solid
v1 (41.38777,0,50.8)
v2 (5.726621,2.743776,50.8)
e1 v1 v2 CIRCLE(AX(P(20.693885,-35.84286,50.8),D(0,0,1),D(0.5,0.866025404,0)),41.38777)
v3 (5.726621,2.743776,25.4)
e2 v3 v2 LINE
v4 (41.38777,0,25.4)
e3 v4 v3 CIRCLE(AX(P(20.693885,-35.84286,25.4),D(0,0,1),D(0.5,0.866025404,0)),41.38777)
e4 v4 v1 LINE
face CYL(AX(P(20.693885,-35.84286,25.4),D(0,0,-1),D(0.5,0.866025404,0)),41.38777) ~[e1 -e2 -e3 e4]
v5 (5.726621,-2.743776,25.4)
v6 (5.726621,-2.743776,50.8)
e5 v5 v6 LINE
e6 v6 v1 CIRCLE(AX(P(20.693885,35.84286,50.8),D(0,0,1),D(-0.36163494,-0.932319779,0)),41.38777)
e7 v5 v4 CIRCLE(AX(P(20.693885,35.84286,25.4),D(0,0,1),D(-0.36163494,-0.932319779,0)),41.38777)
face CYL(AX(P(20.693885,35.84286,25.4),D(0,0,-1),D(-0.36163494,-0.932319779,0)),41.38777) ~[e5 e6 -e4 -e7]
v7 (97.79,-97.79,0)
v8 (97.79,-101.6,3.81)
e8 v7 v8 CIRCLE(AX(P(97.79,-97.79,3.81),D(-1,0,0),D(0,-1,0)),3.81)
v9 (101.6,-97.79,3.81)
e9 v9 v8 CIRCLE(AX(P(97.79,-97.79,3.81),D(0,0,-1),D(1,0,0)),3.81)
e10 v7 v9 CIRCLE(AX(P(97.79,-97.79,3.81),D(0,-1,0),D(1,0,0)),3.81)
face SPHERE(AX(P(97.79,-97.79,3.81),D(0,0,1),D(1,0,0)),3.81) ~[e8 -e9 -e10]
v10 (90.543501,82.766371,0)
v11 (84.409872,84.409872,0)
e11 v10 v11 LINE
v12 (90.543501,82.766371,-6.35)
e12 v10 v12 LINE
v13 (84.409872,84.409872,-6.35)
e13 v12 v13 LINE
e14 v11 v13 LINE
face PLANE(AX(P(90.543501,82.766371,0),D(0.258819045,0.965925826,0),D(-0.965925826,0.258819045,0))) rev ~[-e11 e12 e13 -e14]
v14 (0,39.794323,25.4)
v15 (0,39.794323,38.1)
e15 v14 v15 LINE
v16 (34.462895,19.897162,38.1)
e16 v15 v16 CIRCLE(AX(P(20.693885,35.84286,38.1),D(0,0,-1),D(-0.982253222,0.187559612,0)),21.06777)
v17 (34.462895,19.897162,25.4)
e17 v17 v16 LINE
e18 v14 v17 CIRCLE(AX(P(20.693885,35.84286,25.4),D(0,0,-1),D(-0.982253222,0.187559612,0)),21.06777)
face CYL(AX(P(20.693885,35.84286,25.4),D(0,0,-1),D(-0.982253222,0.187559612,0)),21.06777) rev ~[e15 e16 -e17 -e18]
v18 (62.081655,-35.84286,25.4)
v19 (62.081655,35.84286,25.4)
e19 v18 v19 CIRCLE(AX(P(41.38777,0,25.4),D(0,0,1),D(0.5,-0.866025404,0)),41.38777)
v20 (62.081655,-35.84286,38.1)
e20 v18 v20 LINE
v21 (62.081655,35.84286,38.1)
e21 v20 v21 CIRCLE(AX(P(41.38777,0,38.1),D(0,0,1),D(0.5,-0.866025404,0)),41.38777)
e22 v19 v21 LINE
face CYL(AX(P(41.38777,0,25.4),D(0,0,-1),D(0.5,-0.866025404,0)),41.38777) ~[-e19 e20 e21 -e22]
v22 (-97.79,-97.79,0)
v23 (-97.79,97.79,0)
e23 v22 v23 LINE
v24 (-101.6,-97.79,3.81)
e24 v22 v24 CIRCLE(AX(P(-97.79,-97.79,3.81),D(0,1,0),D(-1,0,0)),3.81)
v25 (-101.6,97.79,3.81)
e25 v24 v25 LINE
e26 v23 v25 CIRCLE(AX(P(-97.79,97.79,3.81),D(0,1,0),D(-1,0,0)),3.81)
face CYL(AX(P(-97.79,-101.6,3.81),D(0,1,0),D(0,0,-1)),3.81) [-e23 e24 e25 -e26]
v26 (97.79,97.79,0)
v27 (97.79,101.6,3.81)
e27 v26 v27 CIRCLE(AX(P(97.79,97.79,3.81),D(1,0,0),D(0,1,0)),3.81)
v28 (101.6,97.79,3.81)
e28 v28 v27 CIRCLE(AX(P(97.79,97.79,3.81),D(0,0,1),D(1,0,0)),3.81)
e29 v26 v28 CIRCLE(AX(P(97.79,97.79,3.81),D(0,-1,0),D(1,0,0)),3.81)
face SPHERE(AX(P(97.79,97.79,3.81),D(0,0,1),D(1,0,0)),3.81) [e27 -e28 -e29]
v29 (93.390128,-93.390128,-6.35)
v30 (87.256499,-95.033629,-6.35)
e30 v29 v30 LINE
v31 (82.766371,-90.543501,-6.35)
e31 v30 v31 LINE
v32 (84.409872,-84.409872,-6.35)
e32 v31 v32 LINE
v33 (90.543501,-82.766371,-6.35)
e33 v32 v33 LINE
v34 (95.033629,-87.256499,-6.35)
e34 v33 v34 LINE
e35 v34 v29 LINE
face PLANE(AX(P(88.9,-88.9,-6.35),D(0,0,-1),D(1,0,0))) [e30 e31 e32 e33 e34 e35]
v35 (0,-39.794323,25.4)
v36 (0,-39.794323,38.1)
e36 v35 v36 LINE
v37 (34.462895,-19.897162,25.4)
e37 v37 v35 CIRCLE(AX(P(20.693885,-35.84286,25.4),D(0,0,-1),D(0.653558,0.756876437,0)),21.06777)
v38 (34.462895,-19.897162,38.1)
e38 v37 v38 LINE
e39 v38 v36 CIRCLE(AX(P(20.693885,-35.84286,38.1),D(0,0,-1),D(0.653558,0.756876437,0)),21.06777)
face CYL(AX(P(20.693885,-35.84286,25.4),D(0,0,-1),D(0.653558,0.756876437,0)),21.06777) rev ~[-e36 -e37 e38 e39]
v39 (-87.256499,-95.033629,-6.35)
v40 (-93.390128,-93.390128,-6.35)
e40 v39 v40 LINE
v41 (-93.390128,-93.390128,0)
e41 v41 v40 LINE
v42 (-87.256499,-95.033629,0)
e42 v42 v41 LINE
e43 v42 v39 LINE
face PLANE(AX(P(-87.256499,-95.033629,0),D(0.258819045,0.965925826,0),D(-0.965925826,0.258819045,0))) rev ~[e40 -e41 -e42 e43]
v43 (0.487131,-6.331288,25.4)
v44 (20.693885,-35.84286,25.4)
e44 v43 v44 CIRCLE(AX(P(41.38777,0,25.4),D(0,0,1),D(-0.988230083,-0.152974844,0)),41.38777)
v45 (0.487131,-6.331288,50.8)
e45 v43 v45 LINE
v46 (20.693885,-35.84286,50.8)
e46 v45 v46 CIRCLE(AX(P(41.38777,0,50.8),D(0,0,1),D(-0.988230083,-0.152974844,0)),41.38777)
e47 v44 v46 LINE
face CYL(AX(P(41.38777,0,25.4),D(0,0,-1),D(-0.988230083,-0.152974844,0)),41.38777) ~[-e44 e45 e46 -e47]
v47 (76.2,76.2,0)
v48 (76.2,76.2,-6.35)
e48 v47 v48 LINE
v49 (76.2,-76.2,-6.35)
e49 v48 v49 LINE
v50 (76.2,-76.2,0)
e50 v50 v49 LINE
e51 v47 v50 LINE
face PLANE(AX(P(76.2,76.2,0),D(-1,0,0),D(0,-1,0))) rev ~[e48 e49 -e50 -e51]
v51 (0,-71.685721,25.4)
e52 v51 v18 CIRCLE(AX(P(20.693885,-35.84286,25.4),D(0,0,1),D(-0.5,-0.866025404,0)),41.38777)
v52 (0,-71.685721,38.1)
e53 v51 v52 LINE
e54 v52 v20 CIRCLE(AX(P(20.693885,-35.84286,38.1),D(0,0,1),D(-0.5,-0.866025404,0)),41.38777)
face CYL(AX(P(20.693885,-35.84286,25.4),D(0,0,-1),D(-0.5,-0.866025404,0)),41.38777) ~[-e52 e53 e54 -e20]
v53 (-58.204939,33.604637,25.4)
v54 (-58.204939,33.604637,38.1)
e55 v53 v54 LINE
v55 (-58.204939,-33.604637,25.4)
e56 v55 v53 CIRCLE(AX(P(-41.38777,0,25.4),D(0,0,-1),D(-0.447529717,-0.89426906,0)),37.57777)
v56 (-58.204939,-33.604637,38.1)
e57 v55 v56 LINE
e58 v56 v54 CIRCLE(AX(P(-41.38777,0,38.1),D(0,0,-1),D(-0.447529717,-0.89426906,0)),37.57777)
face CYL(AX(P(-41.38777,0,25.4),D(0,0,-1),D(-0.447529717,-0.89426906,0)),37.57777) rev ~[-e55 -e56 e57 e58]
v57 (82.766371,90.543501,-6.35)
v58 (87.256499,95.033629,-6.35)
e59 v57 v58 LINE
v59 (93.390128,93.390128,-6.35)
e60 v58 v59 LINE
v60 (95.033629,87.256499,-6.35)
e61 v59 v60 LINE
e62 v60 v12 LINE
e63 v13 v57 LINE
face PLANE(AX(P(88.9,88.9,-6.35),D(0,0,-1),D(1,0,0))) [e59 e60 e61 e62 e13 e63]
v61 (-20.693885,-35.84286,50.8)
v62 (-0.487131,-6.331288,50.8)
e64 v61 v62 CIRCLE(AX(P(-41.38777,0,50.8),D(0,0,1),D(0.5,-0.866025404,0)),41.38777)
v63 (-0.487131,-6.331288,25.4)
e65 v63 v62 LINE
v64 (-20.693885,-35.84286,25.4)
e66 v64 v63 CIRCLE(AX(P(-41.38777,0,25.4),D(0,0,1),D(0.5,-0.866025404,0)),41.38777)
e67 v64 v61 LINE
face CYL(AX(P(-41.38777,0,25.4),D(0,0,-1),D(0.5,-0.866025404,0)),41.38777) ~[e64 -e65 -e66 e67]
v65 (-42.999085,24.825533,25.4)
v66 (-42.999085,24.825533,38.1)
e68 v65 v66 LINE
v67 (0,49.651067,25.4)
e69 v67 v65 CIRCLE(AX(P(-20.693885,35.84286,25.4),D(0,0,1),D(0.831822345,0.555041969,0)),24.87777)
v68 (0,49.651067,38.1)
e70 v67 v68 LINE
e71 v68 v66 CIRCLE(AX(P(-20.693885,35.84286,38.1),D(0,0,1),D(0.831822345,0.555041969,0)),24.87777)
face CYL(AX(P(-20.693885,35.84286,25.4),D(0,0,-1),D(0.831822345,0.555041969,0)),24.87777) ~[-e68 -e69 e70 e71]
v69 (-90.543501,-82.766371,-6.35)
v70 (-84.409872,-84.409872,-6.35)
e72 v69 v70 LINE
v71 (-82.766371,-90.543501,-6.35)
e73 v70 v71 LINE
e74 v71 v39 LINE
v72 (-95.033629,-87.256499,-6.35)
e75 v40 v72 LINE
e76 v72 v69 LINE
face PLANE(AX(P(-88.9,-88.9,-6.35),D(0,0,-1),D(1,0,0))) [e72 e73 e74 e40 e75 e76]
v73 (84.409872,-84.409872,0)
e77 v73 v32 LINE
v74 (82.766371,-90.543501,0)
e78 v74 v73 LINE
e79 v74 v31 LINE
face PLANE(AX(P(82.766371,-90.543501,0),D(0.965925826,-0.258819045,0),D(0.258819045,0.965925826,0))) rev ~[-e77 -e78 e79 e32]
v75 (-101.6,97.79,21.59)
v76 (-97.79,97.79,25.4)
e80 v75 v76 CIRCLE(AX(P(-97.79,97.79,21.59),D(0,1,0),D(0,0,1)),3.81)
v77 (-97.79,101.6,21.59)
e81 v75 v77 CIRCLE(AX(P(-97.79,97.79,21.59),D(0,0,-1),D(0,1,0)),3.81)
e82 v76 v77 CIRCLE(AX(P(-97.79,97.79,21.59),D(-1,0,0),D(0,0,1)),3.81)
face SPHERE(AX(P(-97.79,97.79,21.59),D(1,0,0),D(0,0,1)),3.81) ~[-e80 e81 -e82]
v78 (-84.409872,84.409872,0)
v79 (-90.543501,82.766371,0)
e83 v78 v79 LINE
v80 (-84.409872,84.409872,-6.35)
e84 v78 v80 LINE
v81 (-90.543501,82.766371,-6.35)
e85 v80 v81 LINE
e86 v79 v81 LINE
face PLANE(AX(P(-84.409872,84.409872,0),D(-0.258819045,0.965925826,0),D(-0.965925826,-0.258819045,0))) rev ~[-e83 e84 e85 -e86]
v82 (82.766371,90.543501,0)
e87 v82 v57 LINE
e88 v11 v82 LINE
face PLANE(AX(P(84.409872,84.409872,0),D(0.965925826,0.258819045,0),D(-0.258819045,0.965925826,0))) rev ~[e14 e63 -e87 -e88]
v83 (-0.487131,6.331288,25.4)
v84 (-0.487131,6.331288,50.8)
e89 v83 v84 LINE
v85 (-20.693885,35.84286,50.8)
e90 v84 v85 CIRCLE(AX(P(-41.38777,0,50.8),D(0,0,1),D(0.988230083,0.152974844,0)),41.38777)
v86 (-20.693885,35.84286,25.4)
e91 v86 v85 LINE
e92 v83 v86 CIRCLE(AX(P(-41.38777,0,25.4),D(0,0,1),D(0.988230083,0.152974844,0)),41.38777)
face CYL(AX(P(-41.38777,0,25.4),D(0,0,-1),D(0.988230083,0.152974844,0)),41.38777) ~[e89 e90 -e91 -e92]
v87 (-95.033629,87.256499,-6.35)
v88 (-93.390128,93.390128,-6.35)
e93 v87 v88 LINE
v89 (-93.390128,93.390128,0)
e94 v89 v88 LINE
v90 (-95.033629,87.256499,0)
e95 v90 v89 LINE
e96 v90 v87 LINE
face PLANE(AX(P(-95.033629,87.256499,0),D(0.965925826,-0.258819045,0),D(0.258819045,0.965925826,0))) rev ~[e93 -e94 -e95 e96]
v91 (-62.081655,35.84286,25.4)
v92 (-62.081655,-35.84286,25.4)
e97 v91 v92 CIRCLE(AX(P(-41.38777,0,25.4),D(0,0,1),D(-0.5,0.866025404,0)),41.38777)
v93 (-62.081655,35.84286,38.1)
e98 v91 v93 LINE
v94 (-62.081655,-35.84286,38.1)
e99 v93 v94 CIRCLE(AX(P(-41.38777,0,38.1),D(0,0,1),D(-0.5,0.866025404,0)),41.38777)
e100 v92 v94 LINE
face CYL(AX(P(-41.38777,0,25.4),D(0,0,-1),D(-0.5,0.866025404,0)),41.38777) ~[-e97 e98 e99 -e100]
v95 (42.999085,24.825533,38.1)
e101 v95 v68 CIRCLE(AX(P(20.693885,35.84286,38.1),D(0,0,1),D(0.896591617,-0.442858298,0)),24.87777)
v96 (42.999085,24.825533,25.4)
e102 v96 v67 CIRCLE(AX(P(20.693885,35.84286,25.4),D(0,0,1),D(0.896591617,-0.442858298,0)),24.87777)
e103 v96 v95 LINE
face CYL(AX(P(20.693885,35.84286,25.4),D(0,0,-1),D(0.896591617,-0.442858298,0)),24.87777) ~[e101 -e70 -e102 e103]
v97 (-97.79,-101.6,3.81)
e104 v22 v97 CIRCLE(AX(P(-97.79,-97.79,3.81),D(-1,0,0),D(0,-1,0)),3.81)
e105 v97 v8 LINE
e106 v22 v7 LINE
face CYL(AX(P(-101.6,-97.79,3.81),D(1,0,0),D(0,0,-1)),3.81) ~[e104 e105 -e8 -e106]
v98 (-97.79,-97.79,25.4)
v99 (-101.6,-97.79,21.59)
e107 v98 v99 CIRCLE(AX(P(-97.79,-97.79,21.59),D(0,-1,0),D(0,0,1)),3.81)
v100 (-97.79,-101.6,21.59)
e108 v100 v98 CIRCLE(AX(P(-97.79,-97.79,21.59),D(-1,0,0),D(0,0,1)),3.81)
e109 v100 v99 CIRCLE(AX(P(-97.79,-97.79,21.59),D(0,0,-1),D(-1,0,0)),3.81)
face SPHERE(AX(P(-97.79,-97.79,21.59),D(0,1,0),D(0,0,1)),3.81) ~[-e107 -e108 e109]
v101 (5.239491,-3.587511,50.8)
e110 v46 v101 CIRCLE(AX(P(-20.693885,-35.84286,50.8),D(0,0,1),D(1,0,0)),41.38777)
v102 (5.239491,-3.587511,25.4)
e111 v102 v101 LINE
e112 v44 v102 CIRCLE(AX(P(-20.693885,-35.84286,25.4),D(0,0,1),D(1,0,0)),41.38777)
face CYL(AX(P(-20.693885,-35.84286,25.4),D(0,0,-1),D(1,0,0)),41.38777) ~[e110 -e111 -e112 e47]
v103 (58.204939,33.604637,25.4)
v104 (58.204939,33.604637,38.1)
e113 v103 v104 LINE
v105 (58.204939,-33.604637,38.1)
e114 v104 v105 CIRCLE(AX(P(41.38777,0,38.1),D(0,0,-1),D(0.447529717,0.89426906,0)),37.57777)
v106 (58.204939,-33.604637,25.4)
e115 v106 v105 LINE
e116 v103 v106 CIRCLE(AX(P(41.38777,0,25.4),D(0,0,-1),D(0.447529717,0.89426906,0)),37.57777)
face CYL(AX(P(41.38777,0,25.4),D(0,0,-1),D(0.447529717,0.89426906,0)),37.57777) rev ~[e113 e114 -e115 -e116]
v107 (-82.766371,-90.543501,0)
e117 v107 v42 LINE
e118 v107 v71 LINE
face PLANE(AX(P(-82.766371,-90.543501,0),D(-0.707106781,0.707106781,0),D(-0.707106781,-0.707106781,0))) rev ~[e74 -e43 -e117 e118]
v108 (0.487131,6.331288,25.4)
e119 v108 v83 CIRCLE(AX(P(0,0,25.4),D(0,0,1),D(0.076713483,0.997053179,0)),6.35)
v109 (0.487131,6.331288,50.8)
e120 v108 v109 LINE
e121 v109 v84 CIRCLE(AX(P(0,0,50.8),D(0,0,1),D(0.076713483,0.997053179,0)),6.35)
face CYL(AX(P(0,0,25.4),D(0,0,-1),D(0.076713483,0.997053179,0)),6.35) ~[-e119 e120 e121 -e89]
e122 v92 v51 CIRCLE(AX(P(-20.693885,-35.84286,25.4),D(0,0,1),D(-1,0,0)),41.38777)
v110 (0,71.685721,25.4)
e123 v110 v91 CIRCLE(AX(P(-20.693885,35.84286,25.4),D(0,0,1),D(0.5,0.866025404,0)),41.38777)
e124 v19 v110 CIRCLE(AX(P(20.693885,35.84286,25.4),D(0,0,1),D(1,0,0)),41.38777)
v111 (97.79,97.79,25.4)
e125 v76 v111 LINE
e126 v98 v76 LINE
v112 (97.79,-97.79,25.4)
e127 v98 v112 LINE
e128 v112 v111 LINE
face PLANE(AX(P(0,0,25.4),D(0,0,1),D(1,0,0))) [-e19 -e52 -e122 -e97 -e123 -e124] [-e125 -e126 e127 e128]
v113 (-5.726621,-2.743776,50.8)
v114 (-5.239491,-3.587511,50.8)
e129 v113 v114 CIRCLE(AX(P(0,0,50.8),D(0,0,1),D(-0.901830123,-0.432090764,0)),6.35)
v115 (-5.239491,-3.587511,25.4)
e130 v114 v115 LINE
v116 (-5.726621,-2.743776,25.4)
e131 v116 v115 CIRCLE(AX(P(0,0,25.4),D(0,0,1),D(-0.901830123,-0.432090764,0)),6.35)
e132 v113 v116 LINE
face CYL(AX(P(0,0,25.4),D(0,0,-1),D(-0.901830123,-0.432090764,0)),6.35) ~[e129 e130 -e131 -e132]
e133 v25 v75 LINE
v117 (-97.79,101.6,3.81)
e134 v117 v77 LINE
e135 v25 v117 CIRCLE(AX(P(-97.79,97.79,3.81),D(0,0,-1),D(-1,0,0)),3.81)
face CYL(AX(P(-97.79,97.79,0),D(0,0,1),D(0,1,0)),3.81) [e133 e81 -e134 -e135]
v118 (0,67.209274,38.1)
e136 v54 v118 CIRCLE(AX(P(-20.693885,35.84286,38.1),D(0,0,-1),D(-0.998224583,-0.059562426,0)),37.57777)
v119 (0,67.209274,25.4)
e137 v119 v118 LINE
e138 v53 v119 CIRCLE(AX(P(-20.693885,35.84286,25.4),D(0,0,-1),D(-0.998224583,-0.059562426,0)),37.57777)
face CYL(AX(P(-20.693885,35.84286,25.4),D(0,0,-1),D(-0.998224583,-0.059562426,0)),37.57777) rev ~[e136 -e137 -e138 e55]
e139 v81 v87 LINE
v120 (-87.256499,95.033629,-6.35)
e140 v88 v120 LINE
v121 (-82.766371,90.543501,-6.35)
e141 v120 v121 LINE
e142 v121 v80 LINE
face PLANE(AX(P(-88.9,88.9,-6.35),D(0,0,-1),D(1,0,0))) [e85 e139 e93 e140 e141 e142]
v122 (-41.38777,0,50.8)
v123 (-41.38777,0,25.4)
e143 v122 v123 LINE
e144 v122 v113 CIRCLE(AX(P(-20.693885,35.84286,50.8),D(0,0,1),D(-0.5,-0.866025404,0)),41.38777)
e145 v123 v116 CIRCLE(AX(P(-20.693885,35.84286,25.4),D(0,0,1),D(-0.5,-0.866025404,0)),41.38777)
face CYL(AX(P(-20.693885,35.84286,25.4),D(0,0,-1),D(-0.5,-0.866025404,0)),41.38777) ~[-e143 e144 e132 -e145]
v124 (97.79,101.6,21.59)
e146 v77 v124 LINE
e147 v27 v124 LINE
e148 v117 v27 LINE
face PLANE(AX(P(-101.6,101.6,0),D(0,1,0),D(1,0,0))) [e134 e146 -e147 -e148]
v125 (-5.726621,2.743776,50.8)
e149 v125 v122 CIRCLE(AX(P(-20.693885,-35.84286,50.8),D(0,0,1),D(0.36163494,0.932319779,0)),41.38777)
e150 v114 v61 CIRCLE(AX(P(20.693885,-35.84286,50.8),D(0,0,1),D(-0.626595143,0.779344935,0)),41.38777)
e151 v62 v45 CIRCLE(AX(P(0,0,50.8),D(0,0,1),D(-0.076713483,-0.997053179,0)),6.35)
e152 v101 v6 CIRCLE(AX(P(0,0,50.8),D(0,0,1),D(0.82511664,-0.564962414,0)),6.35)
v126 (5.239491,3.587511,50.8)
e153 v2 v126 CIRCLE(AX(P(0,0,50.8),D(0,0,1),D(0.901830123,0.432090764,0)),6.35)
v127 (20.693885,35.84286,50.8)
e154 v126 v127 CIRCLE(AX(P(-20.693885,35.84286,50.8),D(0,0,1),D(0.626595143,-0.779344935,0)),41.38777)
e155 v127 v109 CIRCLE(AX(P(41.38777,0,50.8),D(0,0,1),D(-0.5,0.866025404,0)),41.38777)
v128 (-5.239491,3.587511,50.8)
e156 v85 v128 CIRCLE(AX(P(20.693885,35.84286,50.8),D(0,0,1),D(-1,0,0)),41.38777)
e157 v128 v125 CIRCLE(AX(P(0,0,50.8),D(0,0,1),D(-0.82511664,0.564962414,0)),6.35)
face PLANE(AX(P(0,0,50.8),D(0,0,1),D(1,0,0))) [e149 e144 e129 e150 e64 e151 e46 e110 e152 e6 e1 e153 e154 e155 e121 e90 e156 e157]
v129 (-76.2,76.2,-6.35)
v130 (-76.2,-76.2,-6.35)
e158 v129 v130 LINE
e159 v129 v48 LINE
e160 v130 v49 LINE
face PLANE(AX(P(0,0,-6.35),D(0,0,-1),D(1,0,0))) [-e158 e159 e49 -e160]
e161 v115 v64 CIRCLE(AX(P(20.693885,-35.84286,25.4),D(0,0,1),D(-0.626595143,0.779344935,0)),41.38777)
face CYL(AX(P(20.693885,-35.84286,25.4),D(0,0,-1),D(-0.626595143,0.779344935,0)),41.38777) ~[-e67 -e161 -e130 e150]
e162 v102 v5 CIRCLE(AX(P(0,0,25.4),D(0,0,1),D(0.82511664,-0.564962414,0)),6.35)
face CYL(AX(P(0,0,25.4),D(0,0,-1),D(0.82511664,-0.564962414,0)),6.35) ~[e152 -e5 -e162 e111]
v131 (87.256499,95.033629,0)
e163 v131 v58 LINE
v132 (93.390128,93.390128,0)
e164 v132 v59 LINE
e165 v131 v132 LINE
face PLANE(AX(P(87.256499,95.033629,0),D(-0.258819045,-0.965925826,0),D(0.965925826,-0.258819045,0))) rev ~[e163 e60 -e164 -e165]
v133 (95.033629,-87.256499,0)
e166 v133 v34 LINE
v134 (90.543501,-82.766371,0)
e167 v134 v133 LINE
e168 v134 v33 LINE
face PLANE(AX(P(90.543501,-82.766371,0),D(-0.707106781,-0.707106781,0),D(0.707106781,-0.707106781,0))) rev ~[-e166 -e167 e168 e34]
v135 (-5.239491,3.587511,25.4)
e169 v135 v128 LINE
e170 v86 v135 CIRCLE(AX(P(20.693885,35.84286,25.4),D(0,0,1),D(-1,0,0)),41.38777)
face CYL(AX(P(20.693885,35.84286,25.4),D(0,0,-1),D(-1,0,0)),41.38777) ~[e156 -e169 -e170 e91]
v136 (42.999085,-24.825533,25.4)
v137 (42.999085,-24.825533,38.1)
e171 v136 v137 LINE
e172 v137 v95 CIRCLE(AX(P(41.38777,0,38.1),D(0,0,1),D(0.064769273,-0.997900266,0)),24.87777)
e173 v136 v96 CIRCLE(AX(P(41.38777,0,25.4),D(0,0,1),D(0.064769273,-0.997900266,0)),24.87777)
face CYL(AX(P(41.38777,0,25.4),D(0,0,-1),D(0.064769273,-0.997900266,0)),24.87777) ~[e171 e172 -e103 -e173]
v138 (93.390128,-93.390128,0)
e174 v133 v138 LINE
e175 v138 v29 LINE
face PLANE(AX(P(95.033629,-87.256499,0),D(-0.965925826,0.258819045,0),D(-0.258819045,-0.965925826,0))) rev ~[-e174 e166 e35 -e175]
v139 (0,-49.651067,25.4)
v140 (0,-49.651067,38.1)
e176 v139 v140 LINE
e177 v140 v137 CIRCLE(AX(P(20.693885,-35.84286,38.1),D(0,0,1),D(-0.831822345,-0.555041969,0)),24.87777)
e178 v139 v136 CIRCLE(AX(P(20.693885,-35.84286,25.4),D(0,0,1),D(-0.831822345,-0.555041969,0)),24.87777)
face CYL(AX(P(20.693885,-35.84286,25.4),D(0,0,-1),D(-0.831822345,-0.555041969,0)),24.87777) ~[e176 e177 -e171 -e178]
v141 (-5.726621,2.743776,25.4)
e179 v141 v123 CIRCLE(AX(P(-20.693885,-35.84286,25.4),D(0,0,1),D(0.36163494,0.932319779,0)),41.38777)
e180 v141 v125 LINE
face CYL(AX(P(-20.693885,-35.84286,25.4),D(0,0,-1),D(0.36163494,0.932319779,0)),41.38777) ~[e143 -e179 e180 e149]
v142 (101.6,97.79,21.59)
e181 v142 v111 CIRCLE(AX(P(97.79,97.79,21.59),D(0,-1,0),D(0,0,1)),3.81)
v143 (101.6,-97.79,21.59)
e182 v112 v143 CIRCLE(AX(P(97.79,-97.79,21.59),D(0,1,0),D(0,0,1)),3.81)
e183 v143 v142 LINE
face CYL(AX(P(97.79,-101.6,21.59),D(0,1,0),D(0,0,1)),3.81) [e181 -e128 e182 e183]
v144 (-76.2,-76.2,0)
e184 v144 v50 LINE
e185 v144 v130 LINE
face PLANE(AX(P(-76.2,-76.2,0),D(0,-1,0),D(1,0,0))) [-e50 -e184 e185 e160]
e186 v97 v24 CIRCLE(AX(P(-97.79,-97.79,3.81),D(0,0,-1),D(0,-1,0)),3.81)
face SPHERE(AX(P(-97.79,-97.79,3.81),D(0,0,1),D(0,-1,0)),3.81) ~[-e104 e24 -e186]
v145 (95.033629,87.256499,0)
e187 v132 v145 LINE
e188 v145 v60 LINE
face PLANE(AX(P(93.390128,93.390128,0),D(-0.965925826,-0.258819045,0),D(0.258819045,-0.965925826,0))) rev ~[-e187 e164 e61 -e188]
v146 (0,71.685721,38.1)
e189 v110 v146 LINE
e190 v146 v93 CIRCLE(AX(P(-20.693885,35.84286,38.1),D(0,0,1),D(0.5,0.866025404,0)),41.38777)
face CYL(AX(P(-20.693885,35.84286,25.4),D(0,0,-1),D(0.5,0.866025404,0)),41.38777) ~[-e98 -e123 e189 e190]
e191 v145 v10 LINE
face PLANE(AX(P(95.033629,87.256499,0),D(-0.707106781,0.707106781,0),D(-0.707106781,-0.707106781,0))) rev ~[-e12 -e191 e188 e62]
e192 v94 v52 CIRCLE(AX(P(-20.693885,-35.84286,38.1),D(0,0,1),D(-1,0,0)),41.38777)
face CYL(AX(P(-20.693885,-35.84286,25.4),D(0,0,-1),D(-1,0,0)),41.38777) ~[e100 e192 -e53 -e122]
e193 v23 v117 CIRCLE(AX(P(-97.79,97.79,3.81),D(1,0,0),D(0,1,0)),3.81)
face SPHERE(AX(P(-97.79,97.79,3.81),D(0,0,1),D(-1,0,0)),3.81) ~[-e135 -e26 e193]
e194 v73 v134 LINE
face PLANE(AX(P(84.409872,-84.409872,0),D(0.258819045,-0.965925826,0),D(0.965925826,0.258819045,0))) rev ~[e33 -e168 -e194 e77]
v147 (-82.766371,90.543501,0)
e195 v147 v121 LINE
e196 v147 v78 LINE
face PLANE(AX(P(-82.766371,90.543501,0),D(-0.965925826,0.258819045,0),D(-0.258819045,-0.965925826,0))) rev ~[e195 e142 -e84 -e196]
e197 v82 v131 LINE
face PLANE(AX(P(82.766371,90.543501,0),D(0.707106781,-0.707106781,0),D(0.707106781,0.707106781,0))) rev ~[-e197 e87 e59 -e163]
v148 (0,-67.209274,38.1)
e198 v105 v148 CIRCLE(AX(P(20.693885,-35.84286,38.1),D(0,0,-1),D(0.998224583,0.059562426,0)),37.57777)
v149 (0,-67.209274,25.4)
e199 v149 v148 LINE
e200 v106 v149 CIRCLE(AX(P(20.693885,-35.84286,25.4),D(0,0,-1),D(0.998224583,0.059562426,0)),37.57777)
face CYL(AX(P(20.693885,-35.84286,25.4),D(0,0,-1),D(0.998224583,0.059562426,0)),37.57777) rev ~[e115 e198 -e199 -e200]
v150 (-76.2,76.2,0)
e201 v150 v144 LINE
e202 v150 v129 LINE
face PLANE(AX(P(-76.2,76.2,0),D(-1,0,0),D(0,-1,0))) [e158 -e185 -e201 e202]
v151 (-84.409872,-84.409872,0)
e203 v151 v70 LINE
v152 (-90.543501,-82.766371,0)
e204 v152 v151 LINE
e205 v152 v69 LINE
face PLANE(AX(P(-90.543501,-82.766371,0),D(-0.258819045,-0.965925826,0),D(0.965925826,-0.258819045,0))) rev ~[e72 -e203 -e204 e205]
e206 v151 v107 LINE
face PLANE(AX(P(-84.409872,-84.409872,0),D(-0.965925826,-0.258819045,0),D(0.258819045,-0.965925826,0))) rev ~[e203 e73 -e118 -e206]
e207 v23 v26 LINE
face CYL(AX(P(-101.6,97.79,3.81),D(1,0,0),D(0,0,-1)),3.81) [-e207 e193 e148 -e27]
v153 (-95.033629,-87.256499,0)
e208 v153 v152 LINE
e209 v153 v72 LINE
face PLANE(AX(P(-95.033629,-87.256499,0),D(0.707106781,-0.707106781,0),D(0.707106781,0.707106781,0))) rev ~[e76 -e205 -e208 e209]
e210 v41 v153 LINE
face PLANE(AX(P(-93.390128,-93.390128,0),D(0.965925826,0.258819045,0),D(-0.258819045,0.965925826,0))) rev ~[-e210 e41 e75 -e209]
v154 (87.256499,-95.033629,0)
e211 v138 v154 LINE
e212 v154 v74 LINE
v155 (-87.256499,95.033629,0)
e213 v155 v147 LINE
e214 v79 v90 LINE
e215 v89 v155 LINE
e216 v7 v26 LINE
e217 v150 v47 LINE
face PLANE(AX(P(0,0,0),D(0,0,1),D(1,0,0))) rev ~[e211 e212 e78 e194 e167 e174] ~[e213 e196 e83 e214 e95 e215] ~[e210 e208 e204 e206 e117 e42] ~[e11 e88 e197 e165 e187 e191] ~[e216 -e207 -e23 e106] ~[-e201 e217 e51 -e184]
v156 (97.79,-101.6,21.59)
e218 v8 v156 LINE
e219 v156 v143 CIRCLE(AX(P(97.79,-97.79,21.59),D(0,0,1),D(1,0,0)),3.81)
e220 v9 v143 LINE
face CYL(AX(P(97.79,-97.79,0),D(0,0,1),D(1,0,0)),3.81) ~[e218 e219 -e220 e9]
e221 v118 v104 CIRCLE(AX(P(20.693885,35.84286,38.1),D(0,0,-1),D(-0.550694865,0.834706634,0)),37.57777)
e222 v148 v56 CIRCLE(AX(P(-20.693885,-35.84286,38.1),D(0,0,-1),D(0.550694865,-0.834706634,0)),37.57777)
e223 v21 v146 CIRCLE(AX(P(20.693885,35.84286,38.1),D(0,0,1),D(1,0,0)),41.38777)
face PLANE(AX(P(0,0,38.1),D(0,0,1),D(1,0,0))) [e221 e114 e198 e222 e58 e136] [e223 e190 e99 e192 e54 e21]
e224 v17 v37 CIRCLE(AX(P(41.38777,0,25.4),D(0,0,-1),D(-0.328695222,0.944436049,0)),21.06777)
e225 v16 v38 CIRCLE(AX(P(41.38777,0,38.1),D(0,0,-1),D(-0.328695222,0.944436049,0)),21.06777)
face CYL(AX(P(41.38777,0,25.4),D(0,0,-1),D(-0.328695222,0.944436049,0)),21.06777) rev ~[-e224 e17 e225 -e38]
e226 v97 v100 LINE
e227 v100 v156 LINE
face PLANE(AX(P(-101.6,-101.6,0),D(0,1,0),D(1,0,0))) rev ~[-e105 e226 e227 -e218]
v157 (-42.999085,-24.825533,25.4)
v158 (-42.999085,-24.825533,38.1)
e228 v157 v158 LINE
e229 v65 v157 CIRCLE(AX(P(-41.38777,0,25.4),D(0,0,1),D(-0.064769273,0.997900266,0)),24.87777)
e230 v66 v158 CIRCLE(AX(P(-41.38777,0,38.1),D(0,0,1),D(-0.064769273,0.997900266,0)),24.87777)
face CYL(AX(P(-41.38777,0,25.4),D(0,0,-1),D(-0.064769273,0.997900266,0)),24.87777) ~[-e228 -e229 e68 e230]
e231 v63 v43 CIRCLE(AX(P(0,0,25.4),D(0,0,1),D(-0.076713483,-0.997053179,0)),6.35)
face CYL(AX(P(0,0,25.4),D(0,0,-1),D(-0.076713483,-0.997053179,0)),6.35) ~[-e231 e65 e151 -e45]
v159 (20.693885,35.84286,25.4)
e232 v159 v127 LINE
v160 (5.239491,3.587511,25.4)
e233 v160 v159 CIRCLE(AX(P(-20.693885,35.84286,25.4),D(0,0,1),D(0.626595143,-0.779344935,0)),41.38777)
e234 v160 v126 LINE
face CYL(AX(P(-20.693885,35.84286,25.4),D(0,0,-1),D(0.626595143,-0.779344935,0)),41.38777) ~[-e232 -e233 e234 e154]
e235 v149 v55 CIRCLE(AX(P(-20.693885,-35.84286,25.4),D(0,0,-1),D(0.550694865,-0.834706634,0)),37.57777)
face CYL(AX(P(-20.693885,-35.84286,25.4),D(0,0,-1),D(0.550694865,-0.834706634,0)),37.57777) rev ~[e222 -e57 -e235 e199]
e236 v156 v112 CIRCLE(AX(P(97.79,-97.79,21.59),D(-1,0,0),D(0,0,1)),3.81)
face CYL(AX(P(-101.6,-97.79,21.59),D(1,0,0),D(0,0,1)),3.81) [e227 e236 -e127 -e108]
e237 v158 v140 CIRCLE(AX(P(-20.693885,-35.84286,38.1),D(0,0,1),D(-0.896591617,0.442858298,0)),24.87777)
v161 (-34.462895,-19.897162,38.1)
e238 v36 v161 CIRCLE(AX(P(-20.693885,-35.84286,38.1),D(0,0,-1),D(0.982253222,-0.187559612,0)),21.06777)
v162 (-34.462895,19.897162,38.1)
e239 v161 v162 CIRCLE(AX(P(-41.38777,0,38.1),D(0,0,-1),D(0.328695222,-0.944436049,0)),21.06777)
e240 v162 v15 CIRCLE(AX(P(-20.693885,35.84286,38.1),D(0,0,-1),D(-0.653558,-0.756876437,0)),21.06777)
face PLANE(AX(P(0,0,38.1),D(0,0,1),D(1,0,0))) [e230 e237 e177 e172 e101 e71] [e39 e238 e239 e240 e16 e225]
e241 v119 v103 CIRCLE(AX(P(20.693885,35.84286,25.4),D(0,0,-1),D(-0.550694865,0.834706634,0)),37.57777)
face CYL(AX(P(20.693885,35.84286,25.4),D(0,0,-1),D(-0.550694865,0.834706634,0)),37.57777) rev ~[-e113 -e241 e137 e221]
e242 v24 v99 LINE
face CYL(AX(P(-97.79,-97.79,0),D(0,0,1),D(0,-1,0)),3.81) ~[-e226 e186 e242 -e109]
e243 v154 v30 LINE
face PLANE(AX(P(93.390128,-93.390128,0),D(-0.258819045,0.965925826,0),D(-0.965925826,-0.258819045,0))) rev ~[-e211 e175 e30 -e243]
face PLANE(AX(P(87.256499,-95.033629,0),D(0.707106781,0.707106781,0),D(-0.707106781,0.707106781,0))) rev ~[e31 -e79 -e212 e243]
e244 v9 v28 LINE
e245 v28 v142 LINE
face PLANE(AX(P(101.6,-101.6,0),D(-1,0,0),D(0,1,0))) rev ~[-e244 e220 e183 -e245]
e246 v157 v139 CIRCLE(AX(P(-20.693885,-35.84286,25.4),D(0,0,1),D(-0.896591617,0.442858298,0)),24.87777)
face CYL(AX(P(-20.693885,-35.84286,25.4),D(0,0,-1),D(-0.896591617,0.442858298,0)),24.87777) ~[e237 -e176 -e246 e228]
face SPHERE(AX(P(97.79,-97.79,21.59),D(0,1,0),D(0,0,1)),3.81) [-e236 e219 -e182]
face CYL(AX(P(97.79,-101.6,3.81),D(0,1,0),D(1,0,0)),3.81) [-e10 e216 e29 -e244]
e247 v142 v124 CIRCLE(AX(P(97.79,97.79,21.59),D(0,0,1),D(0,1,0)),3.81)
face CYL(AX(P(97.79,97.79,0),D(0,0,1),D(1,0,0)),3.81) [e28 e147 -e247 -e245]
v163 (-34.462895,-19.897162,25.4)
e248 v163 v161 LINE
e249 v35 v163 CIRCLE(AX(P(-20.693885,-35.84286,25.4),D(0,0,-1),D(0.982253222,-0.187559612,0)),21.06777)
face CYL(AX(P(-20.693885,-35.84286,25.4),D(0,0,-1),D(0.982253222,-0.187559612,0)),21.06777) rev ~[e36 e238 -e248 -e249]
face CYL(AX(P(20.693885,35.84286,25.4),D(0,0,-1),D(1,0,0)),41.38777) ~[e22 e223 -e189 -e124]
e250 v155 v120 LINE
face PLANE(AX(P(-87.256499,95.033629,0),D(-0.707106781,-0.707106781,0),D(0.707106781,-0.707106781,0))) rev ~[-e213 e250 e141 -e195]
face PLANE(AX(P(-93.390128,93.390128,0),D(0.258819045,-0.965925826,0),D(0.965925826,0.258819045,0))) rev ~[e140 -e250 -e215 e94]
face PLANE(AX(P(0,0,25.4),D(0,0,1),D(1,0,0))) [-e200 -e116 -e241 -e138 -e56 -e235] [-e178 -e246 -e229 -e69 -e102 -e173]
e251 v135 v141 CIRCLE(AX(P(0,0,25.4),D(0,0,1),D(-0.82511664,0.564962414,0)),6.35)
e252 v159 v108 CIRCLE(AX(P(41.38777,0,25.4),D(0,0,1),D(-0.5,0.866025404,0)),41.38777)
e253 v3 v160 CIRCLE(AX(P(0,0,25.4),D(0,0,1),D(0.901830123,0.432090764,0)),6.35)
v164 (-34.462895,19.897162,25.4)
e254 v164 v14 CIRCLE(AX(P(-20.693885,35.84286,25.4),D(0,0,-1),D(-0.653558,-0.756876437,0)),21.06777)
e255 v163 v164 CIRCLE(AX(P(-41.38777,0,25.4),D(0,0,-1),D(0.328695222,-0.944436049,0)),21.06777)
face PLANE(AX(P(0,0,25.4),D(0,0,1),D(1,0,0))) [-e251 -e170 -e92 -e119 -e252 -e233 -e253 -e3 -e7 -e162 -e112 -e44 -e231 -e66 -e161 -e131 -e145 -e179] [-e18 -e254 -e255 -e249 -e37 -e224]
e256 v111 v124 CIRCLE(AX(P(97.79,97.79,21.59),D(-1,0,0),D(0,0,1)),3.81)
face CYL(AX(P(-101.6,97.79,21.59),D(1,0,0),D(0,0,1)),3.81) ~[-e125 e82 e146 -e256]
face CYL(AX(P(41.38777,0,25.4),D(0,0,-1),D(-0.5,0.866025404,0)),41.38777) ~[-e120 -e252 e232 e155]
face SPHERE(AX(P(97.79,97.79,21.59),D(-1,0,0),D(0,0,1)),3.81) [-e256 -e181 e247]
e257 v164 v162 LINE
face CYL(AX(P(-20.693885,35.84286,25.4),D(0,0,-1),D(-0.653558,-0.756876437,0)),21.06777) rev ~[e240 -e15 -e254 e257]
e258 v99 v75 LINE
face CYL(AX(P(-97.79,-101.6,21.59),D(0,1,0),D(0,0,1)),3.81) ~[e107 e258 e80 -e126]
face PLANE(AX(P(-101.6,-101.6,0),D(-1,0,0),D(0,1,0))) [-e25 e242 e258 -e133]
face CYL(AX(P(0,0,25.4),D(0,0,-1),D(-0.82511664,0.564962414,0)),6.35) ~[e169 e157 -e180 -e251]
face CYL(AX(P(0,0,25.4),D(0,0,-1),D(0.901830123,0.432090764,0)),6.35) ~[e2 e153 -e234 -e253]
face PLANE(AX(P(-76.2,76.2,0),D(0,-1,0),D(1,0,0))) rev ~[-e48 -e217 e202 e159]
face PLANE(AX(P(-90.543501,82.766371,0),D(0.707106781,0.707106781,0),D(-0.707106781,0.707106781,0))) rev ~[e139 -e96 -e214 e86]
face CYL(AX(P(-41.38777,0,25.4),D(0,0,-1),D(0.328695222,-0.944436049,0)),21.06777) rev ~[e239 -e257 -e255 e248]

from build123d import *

# Parameters (mm, degrees)
F0_W     = 203.2
F0_H     = 203.2
F1_DEPTH = 25.4
F3_DEPTH = 6.35
F2_W     = 152.4
F2_H     = 152.4
F4_DEPTH = 6.35
F6_DEPTH = 12.7
F7_DEPTH = 12.7
F8_DEPTH = 12.7
F9_DEPTH = 12.7
F10_R    = 3.81


# Not quite as in the source:
# - a feature names something its author has since deleted; it is built from what else it names


with BuildPart() as f1:
    # F0 (on Top) → F1 (new body)
    with BuildSketch(Plane.XY):
        Rectangle(F0_W, F0_H)
    extrude(amount=F1_DEPTH)

    # F2 (on face) → F3 (join)
    with BuildSketch(Plane(origin=(0, 0, 0), x_dir=(1, 0, 0), z_dir=(0, 0, -1))):
        Polygon((-84.4098719395, -84.4098719395), (-90.5435009364, -82.7663710031), (-95.0336289969, -87.2564990636), (-93.3901280605, -93.3901280605), (-87.2564990636, -95.0336289969), (-82.7663710031, -90.5435009364), align=None)
        Polygon((90.5435009364, -82.7663710031), (84.4098719395, -84.4098719395), (82.7663710031, -90.5435009364), (87.2564990636, -95.0336289969), (93.3901280605, -93.3901280605), (95.0336289969, -87.2564990636), align=None)
        Polygon((93.3901280605, 93.3901280605), (87.2564990636, 95.0336289969), (82.7663710031, 90.5435009364), (84.4098719395, 84.4098719395), (90.5435009364, 82.7663710031), (95.0336289969, 87.2564990636), align=None)
        Polygon((-95.0336289969, 87.2564990636), (-90.5435009364, 82.7663710031), (-84.4098719395, 84.4098719395), (-82.7663710031, 90.5435009364), (-87.2564990636, 95.0336289969), (-93.3901280605, 93.3901280605), align=None)
    extrude(amount=F3_DEPTH)

    # F2 (on face) → F4 (join)
    with BuildSketch(Plane(origin=(0, 0, 0), x_dir=(1, 0, 0), z_dir=(0, 0, -1))):
        Rectangle(F2_W, F2_H)
    extrude(amount=F4_DEPTH)

    # F5 (on face) → F6 (join)
    with BuildSketch(Plane.XY.offset(25.4)):
        with BuildLine():
            ThreePointArc((0, -71.685720599), (41.3877700849, -71.685720599), (62.0816551274, -35.8428602995))
            ThreePointArc((62.0816551274, -35.8428602995), (82.7755401698, 0), (62.0816551274, 35.8428602995))
            ThreePointArc((62.0816551274, 35.8428602995), (41.3877700849, 71.685720599), (0, 71.685720599))
            ThreePointArc((0, 71.685720599), (-41.3877700849, 71.685720599), (-62.0816551274, 35.8428602995))
            ThreePointArc((-62.0816551274, 35.8428602995), (-82.7755401698, 0), (-62.0816551274, -35.8428602995))
            ThreePointArc((-62.0816551274, -35.8428602995), (-41.3877700849, -71.685720599), (0, -71.685720599))
        make_face()
        with BuildLine():
            ThreePointArc((0, 67.2092742865), (39.4827700849, 68.3861638106), (58.204938902, 33.6046371433))
            ThreePointArc((58.204938902, 33.6046371433), (78.9655401698, 0), (58.204938902, -33.6046371433))
            ThreePointArc((58.204938902, -33.6046371433), (39.4827700849, -68.3861638106), (0, -67.2092742865))
            ThreePointArc((0, -67.2092742865), (-39.4827700849, -68.3861638106), (-58.204938902, -33.6046371433))
            ThreePointArc((-58.204938902, -33.6046371433), (-78.9655401698, 0), (-58.204938902, 33.6046371433))
            ThreePointArc((-58.204938902, 33.6046371433), (-39.4827700849, 68.3861638106), (0, 67.2092742865))
        make_face(mode=Mode.SUBTRACT)
    extrude(amount=F6_DEPTH)

    # F5 (on face) → F7 (join)
    with BuildSketch(Plane.XY.offset(25.4)):
        with BuildLine():
            ThreePointArc((42.9990851577, -24.8255333907), (66.2655401698, 0), (42.9990851577, 24.8255333907))
            ThreePointArc((42.9990851577, 24.8255333907), (33.1327700849, 57.3876411826), (0, 49.6510667814))
            ThreePointArc((0, 49.6510667814), (-33.1327700849, 57.3876411826), (-42.9990851577, 24.8255333907))
            ThreePointArc((-42.9990851577, 24.8255333907), (-66.2655401698, 0), (-42.9990851577, -24.8255333907))
            ThreePointArc((-42.9990851577, -24.8255333907), (-33.1327700849, -57.3876411826), (0, -49.6510667814))
            ThreePointArc((0, -49.6510667814), (33.1327700849, -57.3876411826), (42.9990851577, -24.8255333907))
        make_face()
        with BuildLine():
            ThreePointArc((-34.4628947241, 19.897161546), (-31.2277700849, 54.0880843941), (0, 39.794323092))
            ThreePointArc((0, 39.794323092), (31.2277700849, 54.0880843941), (34.4628947241, 19.897161546))
            ThreePointArc((34.4628947241, 19.897161546), (62.4555401698, 0), (34.4628947241, -19.897161546))
            ThreePointArc((34.4628947241, -19.897161546), (31.2277700849, -54.0880843941), (0, -39.794323092))
            ThreePointArc((0, -39.794323092), (-31.2277700849, -54.0880843941), (-34.4628947241, -19.897161546))
            ThreePointArc((-34.4628947241, -19.897161546), (-62.4555401698, 0), (-34.4628947241, 19.897161546))
        make_face(mode=Mode.SUBTRACT)
    extrude(amount=F7_DEPTH)

    # F5 (on face) → F8 (join)
    with BuildSketch(Plane.XY.offset(25.4)):
        with BuildLine():
            ThreePointArc((-5.2394906659, -3.5875113327), (-16.6308527593, -17.9595870916), (-20.6938850425, -35.8428602995))
            ThreePointArc((-20.6938850425, -35.8428602995), (-7.2380322831, -23.382534522), (-0.4871306175, -6.3312876859))
            ThreePointArc((-0.4871306175, -6.3312876859), (0, -6.35), (0.4871306175, -6.3312876859))
            ThreePointArc((0.4871306175, -6.3312876859), (7.2380322831, -23.382534522), (20.6938850425, -35.8428602995))
            ThreePointArc((20.6938850425, -35.8428602995), (16.6308527593, -17.9595870916), (5.2394906659, -3.5875113327))
            ThreePointArc((5.2394906659, -3.5875113327), (5.499261314, -3.175), (5.7266212834, -2.7437763532))
            ThreePointArc((5.7266212834, -2.7437763532), (23.8688850425, -5.4229474304), (41.3877700849, 0))
            ThreePointArc((41.3877700849, 0), (23.8688850425, 5.4229474304), (5.7266212834, 2.7437763532))
            ThreePointArc((5.7266212834, 2.7437763532), (5.499261314, 3.175), (5.2394906659, 3.5875113327))
            ThreePointArc((5.2394906659, 3.5875113327), (16.6308527593, 17.9595870916), (20.6938850425, 35.8428602995))
            ThreePointArc((20.6938850425, 35.8428602995), (7.2380322831, 23.382534522), (0.4871306175, 6.3312876859))
            ThreePointArc((0.4871306175, 6.3312876859), (0, 6.35), (-0.4871306175, 6.3312876859))
            ThreePointArc((-0.4871306175, 6.3312876859), (-7.2380322831, 23.382534522), (-20.6938850425, 35.8428602995))
            ThreePointArc((-20.6938850425, 35.8428602995), (-16.6308527593, 17.9595870916), (-5.2394906659, 3.5875113327))
            ThreePointArc((-5.2394906659, 3.5875113327), (-5.499261314, 3.175), (-5.7266212834, 2.7437763532))
            ThreePointArc((-5.7266212834, 2.7437763532), (-23.8688850425, 5.4229474304), (-41.3877700849, 0))
            ThreePointArc((-41.3877700849, 0), (-23.8688850425, -5.4229474304), (-5.7266212834, -2.7437763532))
            ThreePointArc((-5.7266212834, -2.7437763532), (-5.499261314, -3.175), (-5.2394906659, -3.5875113327))
        make_face()
    extrude(amount=F8_DEPTH)

    # F5 (on face) + F8_face (on face) → F9 (join)
    with BuildSketch(Plane.XY.offset(25.4)):
        with BuildLine():
            ThreePointArc((-5.2394906659, -3.5875113327), (-16.6308527593, -17.9595870916), (-20.6938850425, -35.8428602995))
            ThreePointArc((-20.6938850425, -35.8428602995), (-7.2380322831, -23.382534522), (-0.4871306175, -6.3312876859))
            ThreePointArc((-0.4871306175, -6.3312876859), (0, -6.35), (0.4871306175, -6.3312876859))
            ThreePointArc((0.4871306175, -6.3312876859), (7.2380322831, -23.382534522), (20.6938850425, -35.8428602995))
            ThreePointArc((20.6938850425, -35.8428602995), (16.6308527593, -17.9595870916), (5.2394906659, -3.5875113327))
            ThreePointArc((5.2394906659, -3.5875113327), (5.499261314, -3.175), (5.7266212834, -2.7437763532))
            ThreePointArc((5.7266212834, -2.7437763532), (23.8688850425, -5.4229474304), (41.3877700849, 0))
            ThreePointArc((41.3877700849, 0), (23.8688850425, 5.4229474304), (5.7266212834, 2.7437763532))
            ThreePointArc((5.7266212834, 2.7437763532), (5.499261314, 3.175), (5.2394906659, 3.5875113327))
            ThreePointArc((5.2394906659, 3.5875113327), (16.6308527593, 17.9595870916), (20.6938850425, 35.8428602995))
            ThreePointArc((20.6938850425, 35.8428602995), (7.2380322831, 23.382534522), (0.4871306175, 6.3312876859))
            ThreePointArc((0.4871306175, 6.3312876859), (0, 6.35), (-0.4871306175, 6.3312876859))
            ThreePointArc((-0.4871306175, 6.3312876859), (-7.2380322831, 23.382534522), (-20.6938850425, 35.8428602995))
            ThreePointArc((-20.6938850425, 35.8428602995), (-16.6308527593, 17.9595870916), (-5.2394906659, 3.5875113327))
            ThreePointArc((-5.2394906659, 3.5875113327), (-5.499261314, 3.175), (-5.7266212834, 2.7437763532))
            ThreePointArc((-5.7266212834, 2.7437763532), (-23.8688850425, 5.4229474304), (-41.3877700849, 0))
            ThreePointArc((-41.3877700849, 0), (-23.8688850425, -5.4229474304), (-5.7266212834, -2.7437763532))
            ThreePointArc((-5.7266212834, -2.7437763532), (-5.499261314, -3.175), (-5.2394906659, -3.5875113327))
        make_face()
    with BuildSketch(Plane.XY.offset(38.1)):
        with BuildLine():
            ThreePointArc((-5.7266212834, 2.7437763532), (-23.8688850425, 5.4229474304), (-41.3877700849, 0))
            ThreePointArc((-41.3877700849, 0), (-23.8688850425, -5.4229474304), (-5.7266212834, -2.7437763532))
            ThreePointArc((-5.7266212834, -2.7437763532), (-5.499261314, -3.175), (-5.2394906659, -3.5875113327))
            ThreePointArc((-5.2394906659, -3.5875113327), (-16.6308527593, -17.9595870916), (-20.6938850425, -35.8428602995))
            ThreePointArc((-20.6938850425, -35.8428602995), (-7.2380322831, -23.382534522), (-0.4871306175, -6.3312876859))
            ThreePointArc((-0.4871306175, -6.3312876859), (0, -6.35), (0.4871306175, -6.3312876859))
            ThreePointArc((0.4871306175, -6.3312876859), (7.2380322831, -23.382534522), (20.6938850425, -35.8428602995))
            ThreePointArc((20.6938850425, -35.8428602995), (16.6308527593, -17.9595870916), (5.2394906659, -3.5875113327))
            ThreePointArc((5.2394906659, -3.5875113327), (5.499261314, -3.175), (5.7266212834, -2.7437763532))
            ThreePointArc((5.7266212834, -2.7437763532), (23.8688850425, -5.4229474304), (41.3877700849, 0))
            ThreePointArc((41.3877700849, 0), (23.8688850425, 5.4229474304), (5.7266212834, 2.7437763532))
            ThreePointArc((5.7266212834, 2.7437763532), (5.499261314, 3.175), (5.2394906659, 3.5875113327))
            ThreePointArc((5.2394906659, 3.5875113327), (16.6308527593, 17.9595870916), (20.6938850425, 35.8428602995))
            ThreePointArc((20.6938850425, 35.8428602995), (7.2380322831, 23.382534522), (0.4871306175, 6.3312876859))
            ThreePointArc((0.4871306175, 6.3312876859), (0, 6.35), (-0.4871306175, 6.3312876859))
            ThreePointArc((-0.4871306175, 6.3312876859), (-7.2380322831, 23.382534522), (-20.6938850425, 35.8428602995))
            ThreePointArc((-20.6938850425, 35.8428602995), (-16.6308527593, 17.9595870916), (-5.2394906659, 3.5875113327))
            ThreePointArc((-5.2394906659, 3.5875113327), (-5.499261314, 3.175), (-5.7266212834, 2.7437763532))
        make_face()
    extrude(amount=F9_DEPTH)

    # F10
    f10_edges = [f1.edges().sort_by_distance(p)[0] for p in [
        (0, 101.6, 25.4),
        (-101.6, 0, 25.4),
        (101.6, 0, 25.4),
        (0, -101.6, 25.4),
        (101.6, 101.6, 12.7),
        (-101.6, 101.6, 12.7),
        (-101.6, -101.6, 12.7),
        (101.6, -101.6, 12.7),
        (101.6, 0, 0),
        (0, -101.6, 0),
        (-101.6, 0, 0),
        (0, 101.6, 0),
    ]]
    fillet(f10_edges, radius=F10_R)


solid = f1.part
